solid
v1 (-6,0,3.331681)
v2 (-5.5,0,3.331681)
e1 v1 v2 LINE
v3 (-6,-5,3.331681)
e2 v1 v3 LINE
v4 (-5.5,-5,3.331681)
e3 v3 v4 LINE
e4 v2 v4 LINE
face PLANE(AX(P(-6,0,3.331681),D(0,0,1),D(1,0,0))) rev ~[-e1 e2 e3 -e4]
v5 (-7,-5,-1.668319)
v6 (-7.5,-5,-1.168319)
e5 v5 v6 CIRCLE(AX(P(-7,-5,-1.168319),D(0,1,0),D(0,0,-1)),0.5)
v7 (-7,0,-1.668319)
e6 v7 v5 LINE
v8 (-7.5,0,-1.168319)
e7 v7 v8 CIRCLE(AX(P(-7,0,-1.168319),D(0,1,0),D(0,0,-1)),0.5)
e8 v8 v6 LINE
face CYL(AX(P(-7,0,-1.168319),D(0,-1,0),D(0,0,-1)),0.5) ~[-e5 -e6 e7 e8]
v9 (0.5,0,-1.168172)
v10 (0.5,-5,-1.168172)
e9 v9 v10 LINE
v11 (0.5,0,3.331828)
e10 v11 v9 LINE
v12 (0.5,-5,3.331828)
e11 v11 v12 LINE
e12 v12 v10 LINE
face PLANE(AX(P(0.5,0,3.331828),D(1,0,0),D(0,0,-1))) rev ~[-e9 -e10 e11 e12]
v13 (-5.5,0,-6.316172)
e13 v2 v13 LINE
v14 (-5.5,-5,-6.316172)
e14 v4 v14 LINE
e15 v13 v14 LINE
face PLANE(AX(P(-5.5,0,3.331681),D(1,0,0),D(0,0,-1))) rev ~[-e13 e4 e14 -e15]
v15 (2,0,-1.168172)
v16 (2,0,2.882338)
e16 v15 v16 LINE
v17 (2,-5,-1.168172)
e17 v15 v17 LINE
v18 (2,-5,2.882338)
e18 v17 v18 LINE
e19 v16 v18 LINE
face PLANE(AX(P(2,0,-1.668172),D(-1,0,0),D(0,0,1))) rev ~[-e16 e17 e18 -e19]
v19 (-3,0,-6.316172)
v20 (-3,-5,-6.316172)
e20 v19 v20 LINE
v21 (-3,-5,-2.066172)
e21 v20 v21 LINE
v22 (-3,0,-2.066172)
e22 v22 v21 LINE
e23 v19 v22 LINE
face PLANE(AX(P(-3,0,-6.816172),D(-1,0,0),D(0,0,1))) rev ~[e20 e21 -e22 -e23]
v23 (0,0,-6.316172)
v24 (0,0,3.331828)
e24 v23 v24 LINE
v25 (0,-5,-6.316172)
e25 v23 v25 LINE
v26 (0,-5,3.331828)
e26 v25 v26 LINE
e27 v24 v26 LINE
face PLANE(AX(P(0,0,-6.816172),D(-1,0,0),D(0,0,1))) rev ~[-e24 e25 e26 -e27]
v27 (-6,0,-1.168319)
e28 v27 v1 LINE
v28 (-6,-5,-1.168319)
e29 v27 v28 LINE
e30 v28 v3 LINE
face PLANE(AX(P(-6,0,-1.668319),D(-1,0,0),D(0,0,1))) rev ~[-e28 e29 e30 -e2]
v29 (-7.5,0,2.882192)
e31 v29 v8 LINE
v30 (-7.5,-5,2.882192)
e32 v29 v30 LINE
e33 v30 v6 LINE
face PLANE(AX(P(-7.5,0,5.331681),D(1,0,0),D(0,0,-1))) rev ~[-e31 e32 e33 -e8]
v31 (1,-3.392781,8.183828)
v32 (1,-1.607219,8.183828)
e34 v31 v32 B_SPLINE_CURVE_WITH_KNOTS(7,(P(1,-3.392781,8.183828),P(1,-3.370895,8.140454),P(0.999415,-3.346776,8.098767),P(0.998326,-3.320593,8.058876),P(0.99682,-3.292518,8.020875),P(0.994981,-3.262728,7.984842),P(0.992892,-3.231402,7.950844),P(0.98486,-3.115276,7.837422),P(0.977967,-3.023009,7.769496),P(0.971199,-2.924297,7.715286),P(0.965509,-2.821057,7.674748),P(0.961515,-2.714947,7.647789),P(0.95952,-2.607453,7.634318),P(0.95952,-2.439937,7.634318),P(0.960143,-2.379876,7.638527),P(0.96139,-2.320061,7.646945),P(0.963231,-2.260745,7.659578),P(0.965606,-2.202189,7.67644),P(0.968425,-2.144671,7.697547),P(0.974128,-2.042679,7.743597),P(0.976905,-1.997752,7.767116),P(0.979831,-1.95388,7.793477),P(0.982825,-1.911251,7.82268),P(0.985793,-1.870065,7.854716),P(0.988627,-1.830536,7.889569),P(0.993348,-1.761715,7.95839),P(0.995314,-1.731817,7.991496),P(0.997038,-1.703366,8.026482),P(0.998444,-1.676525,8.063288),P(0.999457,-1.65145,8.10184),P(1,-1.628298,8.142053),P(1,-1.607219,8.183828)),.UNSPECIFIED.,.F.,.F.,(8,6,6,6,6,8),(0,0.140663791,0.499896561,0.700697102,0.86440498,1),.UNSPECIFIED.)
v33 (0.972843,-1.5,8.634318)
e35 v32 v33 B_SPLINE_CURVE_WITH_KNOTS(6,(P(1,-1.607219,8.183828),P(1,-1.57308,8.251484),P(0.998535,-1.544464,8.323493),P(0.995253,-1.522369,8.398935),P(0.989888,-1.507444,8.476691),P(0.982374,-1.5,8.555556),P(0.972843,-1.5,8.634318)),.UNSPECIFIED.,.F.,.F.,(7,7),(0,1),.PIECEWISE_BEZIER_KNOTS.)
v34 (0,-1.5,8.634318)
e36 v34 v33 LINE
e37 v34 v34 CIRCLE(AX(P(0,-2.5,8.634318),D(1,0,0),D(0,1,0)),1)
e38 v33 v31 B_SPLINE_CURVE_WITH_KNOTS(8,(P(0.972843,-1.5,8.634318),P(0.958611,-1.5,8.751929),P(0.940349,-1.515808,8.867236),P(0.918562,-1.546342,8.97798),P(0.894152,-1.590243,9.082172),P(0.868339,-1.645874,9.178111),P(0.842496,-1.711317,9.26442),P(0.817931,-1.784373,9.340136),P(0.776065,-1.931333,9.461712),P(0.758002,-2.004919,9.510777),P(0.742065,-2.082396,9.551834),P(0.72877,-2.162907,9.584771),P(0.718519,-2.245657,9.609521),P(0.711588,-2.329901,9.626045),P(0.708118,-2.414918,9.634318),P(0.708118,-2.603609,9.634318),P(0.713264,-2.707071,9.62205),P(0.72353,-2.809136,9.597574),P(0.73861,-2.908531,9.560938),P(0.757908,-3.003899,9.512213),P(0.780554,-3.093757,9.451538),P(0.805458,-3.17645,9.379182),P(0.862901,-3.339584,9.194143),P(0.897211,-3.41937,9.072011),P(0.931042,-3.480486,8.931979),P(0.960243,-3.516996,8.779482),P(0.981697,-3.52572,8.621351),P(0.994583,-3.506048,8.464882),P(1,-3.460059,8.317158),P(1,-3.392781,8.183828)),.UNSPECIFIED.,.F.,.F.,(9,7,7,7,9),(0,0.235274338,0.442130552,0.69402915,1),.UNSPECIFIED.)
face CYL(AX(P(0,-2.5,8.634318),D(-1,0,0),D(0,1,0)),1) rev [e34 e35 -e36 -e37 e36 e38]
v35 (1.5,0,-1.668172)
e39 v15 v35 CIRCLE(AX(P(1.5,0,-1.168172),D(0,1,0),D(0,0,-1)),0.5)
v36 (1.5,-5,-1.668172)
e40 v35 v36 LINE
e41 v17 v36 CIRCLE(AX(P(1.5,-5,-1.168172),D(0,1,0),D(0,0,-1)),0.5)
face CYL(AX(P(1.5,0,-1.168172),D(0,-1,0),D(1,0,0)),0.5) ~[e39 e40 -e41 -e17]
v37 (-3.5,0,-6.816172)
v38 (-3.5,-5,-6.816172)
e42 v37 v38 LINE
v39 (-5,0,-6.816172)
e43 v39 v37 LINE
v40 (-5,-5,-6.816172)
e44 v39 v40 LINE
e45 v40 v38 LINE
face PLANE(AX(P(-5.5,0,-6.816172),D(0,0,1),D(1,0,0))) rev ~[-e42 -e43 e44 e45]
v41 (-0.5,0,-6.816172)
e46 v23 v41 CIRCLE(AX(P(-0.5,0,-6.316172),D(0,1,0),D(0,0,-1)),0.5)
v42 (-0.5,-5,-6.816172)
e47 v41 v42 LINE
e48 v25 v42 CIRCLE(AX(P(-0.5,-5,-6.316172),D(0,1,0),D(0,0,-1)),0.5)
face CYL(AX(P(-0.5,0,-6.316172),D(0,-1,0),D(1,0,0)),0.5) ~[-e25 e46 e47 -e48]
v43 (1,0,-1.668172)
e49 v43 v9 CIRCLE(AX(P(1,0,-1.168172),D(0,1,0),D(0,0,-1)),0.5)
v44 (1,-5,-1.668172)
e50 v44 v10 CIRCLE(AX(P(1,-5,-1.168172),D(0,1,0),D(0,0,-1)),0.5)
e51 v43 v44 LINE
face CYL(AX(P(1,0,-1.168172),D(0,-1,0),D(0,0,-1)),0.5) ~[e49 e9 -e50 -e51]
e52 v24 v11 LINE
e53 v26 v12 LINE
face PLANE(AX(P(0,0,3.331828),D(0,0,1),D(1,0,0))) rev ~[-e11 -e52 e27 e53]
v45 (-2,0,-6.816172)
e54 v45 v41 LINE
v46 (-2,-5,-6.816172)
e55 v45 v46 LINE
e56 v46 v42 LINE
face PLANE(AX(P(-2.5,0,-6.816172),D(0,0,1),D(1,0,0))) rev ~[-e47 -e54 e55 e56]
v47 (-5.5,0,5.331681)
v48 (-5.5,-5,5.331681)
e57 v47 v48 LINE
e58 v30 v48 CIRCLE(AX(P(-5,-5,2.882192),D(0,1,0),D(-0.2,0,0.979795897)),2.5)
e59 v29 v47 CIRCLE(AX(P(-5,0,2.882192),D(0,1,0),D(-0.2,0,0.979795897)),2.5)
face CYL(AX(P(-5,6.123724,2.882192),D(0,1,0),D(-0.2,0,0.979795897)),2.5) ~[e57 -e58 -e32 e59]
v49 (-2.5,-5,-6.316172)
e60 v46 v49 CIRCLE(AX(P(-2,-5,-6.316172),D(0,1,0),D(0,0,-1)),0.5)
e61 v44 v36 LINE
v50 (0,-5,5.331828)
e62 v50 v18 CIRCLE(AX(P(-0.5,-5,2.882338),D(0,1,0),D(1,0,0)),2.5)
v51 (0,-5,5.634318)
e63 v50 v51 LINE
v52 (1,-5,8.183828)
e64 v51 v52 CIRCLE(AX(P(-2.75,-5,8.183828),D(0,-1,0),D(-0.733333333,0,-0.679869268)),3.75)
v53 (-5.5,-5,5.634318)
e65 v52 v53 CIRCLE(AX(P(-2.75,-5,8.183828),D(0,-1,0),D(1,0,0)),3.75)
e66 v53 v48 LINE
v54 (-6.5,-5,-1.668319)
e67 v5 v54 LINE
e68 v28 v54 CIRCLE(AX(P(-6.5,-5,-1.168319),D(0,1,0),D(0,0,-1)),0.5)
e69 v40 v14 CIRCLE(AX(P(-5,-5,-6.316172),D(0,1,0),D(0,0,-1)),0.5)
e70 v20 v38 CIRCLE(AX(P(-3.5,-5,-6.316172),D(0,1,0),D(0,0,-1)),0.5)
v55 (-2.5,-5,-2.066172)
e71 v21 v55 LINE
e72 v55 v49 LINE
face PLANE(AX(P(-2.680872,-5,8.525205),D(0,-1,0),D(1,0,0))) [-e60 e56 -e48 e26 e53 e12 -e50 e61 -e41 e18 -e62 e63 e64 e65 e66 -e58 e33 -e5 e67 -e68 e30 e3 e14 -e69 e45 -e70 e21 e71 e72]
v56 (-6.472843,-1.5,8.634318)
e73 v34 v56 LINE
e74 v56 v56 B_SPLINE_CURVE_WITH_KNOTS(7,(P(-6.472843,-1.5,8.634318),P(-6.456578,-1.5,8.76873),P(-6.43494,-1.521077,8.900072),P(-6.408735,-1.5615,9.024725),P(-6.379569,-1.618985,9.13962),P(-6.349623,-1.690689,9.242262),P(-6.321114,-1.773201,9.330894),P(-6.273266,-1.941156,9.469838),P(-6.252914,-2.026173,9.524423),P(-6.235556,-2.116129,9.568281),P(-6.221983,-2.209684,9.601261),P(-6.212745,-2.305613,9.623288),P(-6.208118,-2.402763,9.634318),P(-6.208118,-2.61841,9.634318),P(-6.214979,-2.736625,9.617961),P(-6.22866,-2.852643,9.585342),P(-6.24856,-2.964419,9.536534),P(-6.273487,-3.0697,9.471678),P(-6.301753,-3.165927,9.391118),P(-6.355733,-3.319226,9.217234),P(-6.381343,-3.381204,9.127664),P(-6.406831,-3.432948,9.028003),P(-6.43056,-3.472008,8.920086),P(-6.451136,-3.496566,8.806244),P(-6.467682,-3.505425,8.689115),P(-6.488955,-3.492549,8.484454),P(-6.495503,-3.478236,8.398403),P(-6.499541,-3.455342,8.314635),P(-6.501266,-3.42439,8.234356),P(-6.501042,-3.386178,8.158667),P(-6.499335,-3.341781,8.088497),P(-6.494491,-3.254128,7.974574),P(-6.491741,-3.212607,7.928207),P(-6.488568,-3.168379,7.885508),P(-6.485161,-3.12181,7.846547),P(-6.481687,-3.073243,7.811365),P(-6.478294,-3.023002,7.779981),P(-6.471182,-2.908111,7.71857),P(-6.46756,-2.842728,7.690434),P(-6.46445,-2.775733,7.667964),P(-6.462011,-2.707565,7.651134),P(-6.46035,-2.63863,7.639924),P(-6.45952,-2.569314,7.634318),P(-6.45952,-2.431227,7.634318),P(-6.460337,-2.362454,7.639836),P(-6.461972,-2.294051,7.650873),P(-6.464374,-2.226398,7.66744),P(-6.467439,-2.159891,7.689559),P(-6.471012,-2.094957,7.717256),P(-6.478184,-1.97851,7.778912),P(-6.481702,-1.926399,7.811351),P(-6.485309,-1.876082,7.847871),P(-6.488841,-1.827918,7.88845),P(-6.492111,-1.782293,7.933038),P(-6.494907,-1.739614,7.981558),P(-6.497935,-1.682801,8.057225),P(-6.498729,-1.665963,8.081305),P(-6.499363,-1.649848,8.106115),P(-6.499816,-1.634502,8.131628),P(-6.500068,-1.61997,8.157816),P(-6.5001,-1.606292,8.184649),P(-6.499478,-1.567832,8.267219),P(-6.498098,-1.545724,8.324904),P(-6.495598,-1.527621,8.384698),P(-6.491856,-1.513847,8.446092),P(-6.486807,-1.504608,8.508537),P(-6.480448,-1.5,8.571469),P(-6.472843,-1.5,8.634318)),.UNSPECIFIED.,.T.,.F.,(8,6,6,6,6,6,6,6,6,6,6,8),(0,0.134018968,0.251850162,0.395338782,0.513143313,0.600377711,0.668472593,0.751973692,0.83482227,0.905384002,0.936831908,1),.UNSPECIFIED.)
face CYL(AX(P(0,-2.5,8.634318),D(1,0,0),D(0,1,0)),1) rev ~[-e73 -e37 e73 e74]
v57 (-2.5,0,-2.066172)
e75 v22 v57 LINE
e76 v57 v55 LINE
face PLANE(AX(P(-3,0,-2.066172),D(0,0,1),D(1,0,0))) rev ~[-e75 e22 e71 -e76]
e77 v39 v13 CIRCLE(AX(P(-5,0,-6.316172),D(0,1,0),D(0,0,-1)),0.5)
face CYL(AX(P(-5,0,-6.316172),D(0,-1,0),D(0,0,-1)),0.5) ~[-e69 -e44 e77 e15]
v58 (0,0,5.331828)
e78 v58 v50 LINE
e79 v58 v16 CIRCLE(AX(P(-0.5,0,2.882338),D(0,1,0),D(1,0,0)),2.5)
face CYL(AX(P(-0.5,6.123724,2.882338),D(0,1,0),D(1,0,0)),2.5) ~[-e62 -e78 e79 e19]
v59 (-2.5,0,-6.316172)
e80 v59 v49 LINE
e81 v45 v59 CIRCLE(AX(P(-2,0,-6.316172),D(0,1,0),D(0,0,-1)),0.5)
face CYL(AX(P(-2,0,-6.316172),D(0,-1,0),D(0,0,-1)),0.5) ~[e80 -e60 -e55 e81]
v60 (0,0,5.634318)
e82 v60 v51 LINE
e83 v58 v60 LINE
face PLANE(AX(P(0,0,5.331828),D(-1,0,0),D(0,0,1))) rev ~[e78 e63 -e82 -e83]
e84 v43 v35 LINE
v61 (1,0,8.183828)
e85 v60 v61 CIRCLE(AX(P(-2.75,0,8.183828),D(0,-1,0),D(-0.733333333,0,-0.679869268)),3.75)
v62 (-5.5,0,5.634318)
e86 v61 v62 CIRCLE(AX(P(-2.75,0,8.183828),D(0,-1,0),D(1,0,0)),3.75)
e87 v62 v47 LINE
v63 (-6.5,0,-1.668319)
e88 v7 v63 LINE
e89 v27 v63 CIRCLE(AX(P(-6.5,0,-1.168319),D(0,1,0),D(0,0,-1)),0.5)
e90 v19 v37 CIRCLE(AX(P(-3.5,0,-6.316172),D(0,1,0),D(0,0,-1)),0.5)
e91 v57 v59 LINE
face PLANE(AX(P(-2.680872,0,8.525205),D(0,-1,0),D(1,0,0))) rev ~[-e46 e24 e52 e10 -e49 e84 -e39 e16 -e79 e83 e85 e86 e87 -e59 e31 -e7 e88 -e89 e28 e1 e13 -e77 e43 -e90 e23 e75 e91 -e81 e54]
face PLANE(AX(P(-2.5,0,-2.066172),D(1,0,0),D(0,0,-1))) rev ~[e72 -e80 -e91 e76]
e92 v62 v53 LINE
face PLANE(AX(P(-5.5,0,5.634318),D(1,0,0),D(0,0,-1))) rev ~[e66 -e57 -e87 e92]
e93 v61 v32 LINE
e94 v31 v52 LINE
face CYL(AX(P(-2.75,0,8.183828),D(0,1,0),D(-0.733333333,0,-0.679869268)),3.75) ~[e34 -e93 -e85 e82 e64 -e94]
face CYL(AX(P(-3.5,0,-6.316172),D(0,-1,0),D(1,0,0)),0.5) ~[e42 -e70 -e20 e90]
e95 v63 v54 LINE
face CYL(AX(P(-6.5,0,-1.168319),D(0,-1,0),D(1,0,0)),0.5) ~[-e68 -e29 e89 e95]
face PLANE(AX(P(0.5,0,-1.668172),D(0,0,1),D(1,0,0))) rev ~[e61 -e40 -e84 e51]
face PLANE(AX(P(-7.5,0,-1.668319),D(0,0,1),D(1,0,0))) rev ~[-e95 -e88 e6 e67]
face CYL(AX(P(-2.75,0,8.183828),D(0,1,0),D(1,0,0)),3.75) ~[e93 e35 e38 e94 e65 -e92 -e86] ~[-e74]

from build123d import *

# Parameters (mm, degrees)
F1_DEPTH      = 10
F2_T1_DEPTH   = 34.4948974279
F3_R          = 1
F4_SCALE      = 0.5
F5_R          = 1
F6_DEPTH      = 25
F6_DEPTH_BACK = 25


# Not quite as in the source:
# - a fillet or chamfer that OpenCascade refuses, or shapes differently, is made with other operations: its cross-section is extruded or revolved along the edge and cut away or added


with BuildPart() as f1:
    # F0 (on Front) → F1 (new body)
    with BuildSketch(Plane.XZ):
        with BuildLine():
            Line((-11, 11.2686367076), (-11, 16.3676562212))
            Line((-11, 16.3676562212), (0, 16.3676562212))
            Line((0, 16.3676562212), (0, 11.2686367076))
            ThreePointArc((0, 11.2686367076), (1.4821200219, 13.6290434337), (2, 16.3676562212))
            ThreePointArc((2, 16.3676562212), (-8.2386127875, 23.3497762431), (-11, 11.2686367076))
        make_face()
        with BuildLine():
            Line((0, 16.3676562212), (-11, 16.3676562212))
            Line((-11, 16.3676562212), (-11, 11.2686367076))
            ThreePointArc((-11, 11.2686367076), (-5.5, 8.8676562212), (0, 11.2686367076))
            Line((0, 11.2686367076), (0, 16.3676562212))
        make_face()
        with BuildLine():
            ThreePointArc((0, 11.2686367076), (-5.5, 8.8676562212), (-11, 11.2686367076))
            Line((-11, 11.2686367076), (-11, 10.6633629519))
            Line((-11, 10.6633629519), (-11, 6.6633629519))
            Line((-11, 6.6633629519), (-11, -3.3366370481))
            Line((-11, -3.3366370481), (-11, -13.6323437788))
            Line((-11, -13.6323437788), (-6, -13.6323437788))
            Line((-6, -13.6323437788), (-6, -4.1323437788))
            Line((-6, -4.1323437788), (-5, -4.1323437788))
            Line((-5, -4.1323437788), (-5, -13.6323437788))
            Line((-5, -13.6323437788), (0, -13.6323437788))
            Line((0, -13.6323437788), (0, -3.3363437788))
            Line((0, -3.3363437788), (0, 6.6636562212))
            Line((0, 6.6636562212), (0, 10.6636562212))
            Line((0, 10.6636562212), (0, 11.2686367076))
        make_face()
        Polygon((-11, 6.6633629519), (-11, 10.6633629519), (-15, 10.6633629519), (-15, -3.3366370481), (-12, -3.3366370481), (-12, 6.6633629519), align=None)
        Polygon((4, 10.6636562212), (0, 10.6636562212), (0, 6.6636562212), (1, 6.6636562212), (1, -3.3363437788), (4, -3.3363437788), align=None)
    extrude(amount=F1_DEPTH)

    # F2: fillet of radius 5 on 2 edges, made by hand

    # F2_s2 → F2_t1 (cut)
    with BuildSketch(Plane.XZ.offset(-12.2474487139)):
        with BuildLine():
            ThreePointArc((4, 5.7646767356), (2.8729833462, 8.9269543958), (0, 10.6636562212))
            Line((0, 10.6636562212), (4, 10.6636562212))
            Line((4, 10.6636562212), (4, 5.7646767356))
        make_face()
        with BuildLine():
            ThreePointArc((-11, 10.6633629519), (-13.8729833462, 8.9266611265), (-15, 5.7643834664))
            Line((-15, 5.7643834664), (-15, 10.6633629519))
            Line((-15, 10.6633629519), (-11, 10.6633629519))
        make_face()
    extrude(amount=F2_T1_DEPTH, mode=Mode.SUBTRACT)

    # F3
    f3_edges = [f1.edges().sort_by_distance(p)[0] for p in [
        (-15, -5, -3.336637),
        (-12, -5, -3.336637),
        (1, -5, -3.336344),
        (4, -5, -3.336344),
        (-5, -5, -13.632344),
        (0, -5, -13.632344),
        (-11, -5, -13.632344),
        (-6, -5, -13.632344),
    ]]
    fillet(f3_edges, radius=F3_R)


with BuildPart() as f1_1:
    # F4: moved
    add(f1.part.scale(F4_SCALE))

    # F5 (on Right) → F6 (cut, two sides)
    with BuildSketch(Plane.YZ) as f6_sk:
        with Locations((-2.5, 8.6343183538)):
            Circle(F5_R)
    extrude(amount=-F6_DEPTH, mode=Mode.SUBTRACT)
    extrude(f6_sk.sketch, amount=F6_DEPTH_BACK, mode=Mode.SUBTRACT)


solid = f1_1.part
